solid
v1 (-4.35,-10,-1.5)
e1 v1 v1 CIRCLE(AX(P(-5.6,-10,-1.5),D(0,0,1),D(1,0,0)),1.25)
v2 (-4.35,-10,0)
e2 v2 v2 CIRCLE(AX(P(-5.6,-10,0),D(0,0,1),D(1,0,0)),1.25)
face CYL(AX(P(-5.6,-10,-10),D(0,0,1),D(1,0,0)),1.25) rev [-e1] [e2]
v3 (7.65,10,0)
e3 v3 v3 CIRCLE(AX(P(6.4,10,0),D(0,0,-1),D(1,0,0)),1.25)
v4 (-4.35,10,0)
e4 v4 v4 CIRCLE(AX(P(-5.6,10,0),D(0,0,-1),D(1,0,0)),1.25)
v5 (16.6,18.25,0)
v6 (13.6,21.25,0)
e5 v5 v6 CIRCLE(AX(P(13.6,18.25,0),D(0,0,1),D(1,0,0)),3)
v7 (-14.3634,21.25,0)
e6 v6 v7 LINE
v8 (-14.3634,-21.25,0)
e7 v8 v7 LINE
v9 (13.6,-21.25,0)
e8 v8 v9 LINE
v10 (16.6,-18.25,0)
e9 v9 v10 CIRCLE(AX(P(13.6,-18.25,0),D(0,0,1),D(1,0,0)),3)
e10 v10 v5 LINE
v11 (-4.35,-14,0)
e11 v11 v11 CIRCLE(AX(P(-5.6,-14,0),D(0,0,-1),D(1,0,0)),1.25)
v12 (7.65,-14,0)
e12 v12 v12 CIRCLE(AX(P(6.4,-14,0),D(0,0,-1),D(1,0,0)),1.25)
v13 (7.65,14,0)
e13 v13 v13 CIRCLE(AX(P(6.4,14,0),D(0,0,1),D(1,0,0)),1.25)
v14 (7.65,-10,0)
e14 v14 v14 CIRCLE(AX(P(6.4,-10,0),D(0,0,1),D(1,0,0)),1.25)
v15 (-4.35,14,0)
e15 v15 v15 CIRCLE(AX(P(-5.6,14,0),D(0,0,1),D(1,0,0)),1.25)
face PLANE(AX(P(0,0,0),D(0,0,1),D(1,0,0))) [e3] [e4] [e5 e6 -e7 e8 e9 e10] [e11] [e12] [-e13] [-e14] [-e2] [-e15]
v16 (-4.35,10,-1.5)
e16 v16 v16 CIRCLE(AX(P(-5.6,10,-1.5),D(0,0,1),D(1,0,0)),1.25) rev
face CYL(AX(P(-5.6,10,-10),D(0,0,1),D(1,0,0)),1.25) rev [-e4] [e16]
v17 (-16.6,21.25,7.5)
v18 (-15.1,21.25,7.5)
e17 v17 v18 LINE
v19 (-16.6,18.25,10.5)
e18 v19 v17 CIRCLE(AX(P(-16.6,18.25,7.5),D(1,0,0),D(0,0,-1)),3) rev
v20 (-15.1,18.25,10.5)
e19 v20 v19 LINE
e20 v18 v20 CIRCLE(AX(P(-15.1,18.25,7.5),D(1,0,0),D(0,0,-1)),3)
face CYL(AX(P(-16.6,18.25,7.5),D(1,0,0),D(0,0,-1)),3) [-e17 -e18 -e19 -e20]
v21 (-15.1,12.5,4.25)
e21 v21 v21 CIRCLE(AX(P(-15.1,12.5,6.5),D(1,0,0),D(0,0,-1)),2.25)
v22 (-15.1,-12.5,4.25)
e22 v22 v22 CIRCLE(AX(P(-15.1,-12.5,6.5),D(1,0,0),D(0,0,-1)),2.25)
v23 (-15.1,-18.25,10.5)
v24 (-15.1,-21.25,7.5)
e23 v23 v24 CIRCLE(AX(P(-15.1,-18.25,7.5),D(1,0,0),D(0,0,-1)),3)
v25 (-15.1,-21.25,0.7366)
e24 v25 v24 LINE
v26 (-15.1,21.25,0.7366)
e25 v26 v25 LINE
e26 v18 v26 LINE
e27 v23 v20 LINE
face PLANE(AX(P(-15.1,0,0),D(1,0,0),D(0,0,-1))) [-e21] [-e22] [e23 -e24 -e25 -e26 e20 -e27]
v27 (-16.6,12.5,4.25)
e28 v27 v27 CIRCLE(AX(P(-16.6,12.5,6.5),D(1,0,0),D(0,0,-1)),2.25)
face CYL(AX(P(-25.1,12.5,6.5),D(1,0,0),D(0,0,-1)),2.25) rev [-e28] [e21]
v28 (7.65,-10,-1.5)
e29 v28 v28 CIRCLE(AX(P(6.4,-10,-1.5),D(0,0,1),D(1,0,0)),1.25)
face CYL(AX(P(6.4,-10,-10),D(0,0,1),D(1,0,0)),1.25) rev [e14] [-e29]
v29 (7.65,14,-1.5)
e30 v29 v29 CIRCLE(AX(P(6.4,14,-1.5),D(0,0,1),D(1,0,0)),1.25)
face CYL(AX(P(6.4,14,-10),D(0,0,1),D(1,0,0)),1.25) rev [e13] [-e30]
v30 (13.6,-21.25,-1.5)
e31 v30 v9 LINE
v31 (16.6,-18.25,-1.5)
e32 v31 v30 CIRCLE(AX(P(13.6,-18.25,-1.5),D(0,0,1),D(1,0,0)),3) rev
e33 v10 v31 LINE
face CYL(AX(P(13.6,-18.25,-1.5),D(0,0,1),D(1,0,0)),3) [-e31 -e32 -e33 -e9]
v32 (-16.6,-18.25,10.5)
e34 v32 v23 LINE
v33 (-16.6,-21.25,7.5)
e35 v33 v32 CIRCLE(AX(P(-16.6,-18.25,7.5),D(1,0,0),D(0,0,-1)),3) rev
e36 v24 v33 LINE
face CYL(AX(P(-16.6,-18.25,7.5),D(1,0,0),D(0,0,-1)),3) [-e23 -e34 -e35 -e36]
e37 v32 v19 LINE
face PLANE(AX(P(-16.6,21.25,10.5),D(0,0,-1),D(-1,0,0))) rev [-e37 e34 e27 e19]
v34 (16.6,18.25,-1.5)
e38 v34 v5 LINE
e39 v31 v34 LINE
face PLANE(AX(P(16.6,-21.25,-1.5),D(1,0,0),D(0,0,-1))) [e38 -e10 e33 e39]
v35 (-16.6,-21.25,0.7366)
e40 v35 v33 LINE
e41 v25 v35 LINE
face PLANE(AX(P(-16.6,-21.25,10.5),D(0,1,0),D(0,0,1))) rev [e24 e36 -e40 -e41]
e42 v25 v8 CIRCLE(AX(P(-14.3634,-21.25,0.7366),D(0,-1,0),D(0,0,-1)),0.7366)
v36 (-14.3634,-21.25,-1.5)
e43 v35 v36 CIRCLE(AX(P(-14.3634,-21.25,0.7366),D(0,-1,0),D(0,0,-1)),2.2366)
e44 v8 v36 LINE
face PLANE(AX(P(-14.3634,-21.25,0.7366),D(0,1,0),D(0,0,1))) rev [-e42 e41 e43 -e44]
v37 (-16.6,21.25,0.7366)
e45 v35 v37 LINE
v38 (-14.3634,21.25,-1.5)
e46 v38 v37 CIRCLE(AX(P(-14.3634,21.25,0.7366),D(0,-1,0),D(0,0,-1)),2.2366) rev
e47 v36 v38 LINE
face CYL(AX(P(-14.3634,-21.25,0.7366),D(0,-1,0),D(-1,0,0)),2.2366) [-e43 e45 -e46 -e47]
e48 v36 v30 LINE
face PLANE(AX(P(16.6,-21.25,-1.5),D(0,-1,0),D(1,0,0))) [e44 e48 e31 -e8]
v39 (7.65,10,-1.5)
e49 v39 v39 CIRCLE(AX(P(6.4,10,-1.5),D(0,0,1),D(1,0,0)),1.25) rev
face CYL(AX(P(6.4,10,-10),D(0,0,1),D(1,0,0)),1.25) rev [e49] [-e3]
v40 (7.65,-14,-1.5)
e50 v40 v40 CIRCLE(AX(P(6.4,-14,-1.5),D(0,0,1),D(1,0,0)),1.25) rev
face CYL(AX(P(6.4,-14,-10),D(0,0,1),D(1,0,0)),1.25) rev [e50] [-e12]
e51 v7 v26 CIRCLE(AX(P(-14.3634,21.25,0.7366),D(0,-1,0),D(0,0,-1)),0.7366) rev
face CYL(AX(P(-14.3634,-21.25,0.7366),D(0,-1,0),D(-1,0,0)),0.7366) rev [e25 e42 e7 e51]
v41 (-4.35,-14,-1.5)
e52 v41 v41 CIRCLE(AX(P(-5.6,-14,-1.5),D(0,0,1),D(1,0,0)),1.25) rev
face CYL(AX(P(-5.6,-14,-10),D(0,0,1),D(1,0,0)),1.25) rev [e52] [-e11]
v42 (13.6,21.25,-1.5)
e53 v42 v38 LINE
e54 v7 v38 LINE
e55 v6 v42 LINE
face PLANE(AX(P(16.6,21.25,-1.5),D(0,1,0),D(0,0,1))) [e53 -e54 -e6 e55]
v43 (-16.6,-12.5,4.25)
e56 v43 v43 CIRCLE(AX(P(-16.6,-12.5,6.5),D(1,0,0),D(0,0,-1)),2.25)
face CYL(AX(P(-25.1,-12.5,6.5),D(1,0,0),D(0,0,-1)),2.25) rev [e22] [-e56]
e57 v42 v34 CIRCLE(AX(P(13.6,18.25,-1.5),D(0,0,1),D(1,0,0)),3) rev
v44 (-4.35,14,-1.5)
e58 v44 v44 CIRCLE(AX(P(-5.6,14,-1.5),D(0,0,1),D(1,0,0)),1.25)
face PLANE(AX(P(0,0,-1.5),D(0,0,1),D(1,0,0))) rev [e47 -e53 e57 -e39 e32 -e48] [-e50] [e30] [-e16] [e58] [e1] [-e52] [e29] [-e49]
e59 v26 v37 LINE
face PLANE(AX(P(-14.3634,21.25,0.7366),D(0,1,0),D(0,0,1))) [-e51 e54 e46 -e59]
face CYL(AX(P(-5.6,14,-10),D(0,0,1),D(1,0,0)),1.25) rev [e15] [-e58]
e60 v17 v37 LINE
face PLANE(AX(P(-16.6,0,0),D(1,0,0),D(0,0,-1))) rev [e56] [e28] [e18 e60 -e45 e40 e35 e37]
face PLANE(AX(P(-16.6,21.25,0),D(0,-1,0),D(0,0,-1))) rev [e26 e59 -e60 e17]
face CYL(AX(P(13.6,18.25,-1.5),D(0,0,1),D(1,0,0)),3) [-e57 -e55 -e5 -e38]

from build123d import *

# Parameters (mm, degrees)
SKETCH_1_W                       = 33.2
SKETCH_1_H                       = 42.5
SM_BASE_FLANGE_1_DEPTH           = 1.5
SM_EDGE_FLANGE_1_STRIP_W         = 7.4732
SM_EDGE_FLANGE_1_STRIP_H         = 1.5
SM_EDGE_FLANGE_1_STRIP_CUT_DEPTH = 42.5
SM_EDGE_FLANGE_1_DEPTH           = 42.5
SKETCH_9_R                       = 1.25
CUT_EXTRUDE_1_DEPTH              = 10
SKETCH_10_R                      = 2.25
CUT_EXTRUDE_2_DEPTH              = 10
FILLET_1_R                       = 3


# Sheet-metal steps are written as plain solids
with BuildPart() as part:
    # Sketch 1 → 基体-法兰1 (new body)
    with BuildSketch(Plane.XY):
        Rectangle(SKETCH_1_W, SKETCH_1_H)
    extrude(amount=-SM_BASE_FLANGE_1_DEPTH)

    # 边线-法兰1 strip (across the edge) → 边线-法兰1 strip cut (cut)
    with BuildSketch(Plane(origin=(-16.6, 21.25, 0), x_dir=(1, 0, 0), z_dir=(0, -1, 0))):
        with Locations((-1.5, -0.75)):
            Rectangle(SM_EDGE_FLANGE_1_STRIP_W, SM_EDGE_FLANGE_1_STRIP_H)
    extrude(amount=SM_EDGE_FLANGE_1_STRIP_CUT_DEPTH, mode=Mode.SUBTRACT)

    # 边线-法兰1 section (across the edge) → 边线-法兰1 (add)
    with BuildSketch(Plane(origin=(-16.6, 21.25, 0), x_dir=(1, 0, 0), z_dir=(0, -1, 0))):
        with BuildLine():
            Line((0, 0.7366), (0, 10.5))
            Line((0, 10.5), (1.5, 10.5))
            Line((1.5, 10.5), (1.5, 0.7366))
            ThreePointArc((1.5, 0.7366), (1.715745145, 0.215745145), (2.2366, 0))
            Line((2.2366, 0), (2.2366, -1.5))
            ThreePointArc((2.2366, -1.5), (0.655084973, -0.844915027), (0, 0.7366))
        make_face()
    extrude(amount=SM_EDGE_FLANGE_1_DEPTH)

    # 草图9 → 切除-拉伸1 (cut)
    with BuildSketch(Plane.XY):
        with Locations((6.4, 14)):
            Circle(SKETCH_9_R)
        with Locations((-5.6, 14)):
            Circle(SKETCH_9_R)
        with Locations((6.4, -10)):
            Circle(SKETCH_9_R)
        with Locations((-5.6, -10)):
            Circle(SKETCH_9_R)
    cut_extrude_1 = extrude(amount=-CUT_EXTRUDE_1_DEPTH, mode=Mode.SUBTRACT)

    # 草图10 → 切除-拉伸2 (cut)
    with BuildSketch(Plane(origin=(-15.1, 0, 0), x_dir=(0, 0, -1), z_dir=(1, 0, 0))):
        with Locations((-6.5, 12.5)):
            Circle(SKETCH_10_R)
        with Locations((-6.5, -12.5)):
            Circle(SKETCH_10_R)
    extrude(amount=-CUT_EXTRUDE_2_DEPTH, mode=Mode.SUBTRACT)

    # 镜向1: 切除-拉伸1 across plane
    add(cut_extrude_1.mirror(Plane.ZX), mode=Mode.SUBTRACT)

    # 圆角1
    fillet_1_edges = [part.edges().sort_by_distance(p)[0] for p in [
        (-15.85, 21.25, 10.5),
        (-15.85, -21.25, 10.5),
        (16.6, 21.25, -0.75),
        (16.6, -21.25, -0.75),
    ]]
    fillet(fillet_1_edges, radius=FILLET_1_R)


solid = part.part
